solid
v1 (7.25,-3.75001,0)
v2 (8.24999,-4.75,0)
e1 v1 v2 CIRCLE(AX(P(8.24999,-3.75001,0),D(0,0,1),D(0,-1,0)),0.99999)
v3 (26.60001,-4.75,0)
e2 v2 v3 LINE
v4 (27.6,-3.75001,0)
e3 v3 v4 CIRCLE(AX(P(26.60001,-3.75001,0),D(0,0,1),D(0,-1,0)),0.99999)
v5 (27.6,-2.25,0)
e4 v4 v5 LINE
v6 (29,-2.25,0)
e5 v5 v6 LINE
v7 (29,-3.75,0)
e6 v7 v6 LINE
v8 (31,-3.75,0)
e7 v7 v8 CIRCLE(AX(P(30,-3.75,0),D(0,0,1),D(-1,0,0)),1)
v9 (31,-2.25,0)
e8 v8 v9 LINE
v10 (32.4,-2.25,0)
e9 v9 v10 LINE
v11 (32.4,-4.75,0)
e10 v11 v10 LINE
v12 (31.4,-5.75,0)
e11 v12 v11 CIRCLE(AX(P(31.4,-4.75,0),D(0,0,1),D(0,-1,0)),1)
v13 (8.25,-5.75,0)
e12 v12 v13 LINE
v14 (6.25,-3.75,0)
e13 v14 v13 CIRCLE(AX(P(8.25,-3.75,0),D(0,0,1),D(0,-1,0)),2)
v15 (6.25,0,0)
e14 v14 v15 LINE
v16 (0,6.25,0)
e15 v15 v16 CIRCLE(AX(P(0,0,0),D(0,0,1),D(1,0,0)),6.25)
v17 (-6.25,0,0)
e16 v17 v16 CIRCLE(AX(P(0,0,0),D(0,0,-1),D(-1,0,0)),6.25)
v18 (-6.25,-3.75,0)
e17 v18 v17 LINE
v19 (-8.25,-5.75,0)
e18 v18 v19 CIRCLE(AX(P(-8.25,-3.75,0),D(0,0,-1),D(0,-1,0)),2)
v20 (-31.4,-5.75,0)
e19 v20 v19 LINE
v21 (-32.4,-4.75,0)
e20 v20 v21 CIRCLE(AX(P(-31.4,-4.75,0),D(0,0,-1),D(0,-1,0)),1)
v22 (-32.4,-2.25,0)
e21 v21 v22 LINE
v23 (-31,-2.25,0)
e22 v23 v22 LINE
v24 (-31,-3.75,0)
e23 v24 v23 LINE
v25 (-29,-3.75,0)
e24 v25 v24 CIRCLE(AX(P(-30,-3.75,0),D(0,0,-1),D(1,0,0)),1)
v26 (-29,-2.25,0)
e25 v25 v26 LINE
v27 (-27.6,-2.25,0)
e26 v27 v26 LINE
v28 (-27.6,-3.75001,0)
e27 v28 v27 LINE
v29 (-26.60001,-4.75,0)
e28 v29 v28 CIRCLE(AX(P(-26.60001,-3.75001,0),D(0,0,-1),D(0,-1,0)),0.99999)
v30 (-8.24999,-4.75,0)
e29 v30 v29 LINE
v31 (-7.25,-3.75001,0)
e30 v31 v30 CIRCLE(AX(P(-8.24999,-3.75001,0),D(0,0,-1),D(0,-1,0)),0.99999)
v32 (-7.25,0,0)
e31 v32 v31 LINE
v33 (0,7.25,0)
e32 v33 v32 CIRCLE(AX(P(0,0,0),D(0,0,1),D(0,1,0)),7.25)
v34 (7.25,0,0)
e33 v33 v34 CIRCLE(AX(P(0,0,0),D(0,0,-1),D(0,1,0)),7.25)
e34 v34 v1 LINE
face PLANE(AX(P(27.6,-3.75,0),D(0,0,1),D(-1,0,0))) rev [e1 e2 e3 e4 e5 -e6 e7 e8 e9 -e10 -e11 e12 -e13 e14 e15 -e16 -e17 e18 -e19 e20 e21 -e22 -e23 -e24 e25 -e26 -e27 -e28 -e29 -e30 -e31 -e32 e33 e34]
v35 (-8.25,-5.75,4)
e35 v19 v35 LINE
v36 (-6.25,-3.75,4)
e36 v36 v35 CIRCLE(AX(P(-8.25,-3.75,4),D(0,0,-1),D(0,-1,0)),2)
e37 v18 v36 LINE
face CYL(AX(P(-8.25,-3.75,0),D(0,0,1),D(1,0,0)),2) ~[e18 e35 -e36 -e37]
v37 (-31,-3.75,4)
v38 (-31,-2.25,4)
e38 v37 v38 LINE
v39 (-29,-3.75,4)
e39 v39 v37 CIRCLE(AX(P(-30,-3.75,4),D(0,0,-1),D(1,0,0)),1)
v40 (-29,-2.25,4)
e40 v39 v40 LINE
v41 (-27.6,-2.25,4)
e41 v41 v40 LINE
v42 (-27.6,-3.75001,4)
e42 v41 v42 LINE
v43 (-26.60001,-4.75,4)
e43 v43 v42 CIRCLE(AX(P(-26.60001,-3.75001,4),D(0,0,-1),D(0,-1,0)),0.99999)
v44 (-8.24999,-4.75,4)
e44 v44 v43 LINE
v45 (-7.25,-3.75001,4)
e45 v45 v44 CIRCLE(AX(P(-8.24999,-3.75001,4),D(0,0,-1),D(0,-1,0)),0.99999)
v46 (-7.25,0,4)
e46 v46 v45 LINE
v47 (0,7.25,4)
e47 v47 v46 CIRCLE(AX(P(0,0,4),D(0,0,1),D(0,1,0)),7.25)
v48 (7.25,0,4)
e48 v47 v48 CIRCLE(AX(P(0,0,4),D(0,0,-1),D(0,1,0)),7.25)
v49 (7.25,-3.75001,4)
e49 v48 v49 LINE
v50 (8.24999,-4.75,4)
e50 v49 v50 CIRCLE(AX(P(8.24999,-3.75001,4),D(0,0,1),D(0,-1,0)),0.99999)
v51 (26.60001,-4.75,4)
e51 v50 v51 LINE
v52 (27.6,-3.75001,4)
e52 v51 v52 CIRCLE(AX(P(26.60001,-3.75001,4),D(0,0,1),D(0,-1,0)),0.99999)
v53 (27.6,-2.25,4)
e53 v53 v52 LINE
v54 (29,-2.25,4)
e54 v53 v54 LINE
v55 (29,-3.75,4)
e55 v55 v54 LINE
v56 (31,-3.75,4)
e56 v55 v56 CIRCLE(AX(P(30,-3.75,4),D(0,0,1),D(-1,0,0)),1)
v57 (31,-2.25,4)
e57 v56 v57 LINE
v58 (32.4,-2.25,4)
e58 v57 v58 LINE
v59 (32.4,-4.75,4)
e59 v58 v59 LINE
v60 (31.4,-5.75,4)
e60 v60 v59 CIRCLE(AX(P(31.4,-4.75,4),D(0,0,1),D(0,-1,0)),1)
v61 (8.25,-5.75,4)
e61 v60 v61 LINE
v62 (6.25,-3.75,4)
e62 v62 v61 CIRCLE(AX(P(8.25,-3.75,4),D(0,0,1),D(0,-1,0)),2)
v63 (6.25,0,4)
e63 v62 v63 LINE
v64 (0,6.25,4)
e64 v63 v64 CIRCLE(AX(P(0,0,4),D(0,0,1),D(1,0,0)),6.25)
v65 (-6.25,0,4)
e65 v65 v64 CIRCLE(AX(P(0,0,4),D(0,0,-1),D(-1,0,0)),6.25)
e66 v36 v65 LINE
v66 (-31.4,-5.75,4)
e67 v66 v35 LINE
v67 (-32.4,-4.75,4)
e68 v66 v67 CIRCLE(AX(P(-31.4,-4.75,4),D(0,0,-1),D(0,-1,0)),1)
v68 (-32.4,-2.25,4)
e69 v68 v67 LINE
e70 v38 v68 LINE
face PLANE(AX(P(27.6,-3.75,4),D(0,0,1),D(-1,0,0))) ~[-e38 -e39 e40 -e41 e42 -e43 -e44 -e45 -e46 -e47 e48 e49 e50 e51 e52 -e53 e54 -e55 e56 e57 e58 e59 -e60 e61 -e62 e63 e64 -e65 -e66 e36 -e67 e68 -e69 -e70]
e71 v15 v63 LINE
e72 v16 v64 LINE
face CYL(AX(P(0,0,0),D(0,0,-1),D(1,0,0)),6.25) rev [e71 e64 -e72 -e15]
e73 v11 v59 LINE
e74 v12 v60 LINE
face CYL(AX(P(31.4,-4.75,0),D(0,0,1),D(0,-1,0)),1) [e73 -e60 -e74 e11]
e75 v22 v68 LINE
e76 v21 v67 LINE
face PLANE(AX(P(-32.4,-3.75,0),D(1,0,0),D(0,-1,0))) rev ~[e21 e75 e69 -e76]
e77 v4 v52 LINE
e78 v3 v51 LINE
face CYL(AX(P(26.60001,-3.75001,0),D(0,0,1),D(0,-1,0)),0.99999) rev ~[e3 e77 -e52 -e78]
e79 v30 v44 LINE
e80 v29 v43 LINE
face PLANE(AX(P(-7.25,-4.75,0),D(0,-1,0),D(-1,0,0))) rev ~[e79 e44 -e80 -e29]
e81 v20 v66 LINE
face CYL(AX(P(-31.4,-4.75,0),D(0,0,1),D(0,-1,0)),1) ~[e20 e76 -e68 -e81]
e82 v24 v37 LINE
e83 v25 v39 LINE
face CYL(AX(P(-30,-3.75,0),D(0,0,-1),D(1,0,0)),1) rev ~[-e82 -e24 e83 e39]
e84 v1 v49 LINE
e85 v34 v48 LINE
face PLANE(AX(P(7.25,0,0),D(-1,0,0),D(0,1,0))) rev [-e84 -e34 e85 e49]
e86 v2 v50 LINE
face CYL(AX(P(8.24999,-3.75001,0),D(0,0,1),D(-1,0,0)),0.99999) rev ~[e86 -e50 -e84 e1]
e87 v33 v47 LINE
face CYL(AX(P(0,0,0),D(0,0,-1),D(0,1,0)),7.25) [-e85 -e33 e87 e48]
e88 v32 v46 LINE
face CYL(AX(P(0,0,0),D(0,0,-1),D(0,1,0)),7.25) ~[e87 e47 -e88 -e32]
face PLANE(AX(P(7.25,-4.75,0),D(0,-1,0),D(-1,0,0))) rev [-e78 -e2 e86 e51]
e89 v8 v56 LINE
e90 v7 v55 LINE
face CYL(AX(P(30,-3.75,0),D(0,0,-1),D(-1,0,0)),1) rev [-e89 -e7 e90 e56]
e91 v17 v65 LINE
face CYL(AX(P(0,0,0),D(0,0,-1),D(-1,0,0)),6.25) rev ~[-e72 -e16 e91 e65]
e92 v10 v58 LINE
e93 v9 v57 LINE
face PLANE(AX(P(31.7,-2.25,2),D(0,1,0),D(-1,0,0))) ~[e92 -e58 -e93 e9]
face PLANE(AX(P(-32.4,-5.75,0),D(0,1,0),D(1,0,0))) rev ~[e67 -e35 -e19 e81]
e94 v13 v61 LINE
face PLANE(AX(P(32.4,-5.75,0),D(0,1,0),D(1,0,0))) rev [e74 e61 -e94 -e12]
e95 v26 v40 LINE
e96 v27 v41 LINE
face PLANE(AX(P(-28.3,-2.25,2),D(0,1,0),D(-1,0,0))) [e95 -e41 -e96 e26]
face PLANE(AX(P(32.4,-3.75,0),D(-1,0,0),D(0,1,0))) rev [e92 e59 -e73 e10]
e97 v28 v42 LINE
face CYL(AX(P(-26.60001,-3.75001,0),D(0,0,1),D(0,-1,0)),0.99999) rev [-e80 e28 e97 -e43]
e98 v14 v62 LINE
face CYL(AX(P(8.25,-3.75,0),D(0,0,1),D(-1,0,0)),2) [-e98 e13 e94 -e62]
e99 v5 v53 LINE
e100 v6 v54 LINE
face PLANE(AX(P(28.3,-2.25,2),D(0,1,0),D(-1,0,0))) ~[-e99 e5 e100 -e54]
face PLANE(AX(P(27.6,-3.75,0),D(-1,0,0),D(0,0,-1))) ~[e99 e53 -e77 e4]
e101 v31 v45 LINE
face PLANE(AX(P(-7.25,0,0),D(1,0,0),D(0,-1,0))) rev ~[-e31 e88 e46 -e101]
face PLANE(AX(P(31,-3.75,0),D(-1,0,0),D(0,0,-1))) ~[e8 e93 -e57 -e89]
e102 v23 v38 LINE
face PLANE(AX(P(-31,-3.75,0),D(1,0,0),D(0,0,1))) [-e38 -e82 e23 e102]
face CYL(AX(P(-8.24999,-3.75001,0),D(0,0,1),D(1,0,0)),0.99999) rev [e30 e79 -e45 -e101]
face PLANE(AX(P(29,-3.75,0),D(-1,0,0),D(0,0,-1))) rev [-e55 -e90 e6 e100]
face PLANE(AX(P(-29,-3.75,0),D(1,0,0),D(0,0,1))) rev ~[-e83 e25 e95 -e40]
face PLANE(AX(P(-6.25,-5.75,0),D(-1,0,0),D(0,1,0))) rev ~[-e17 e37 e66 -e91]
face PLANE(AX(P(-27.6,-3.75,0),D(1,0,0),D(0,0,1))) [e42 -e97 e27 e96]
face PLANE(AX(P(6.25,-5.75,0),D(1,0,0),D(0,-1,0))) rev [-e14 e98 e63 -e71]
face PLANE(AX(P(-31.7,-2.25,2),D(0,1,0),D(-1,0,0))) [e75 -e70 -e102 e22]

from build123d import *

# Parameters (mm, degrees)
F1_DEPTH = 4
F2_R     = 0.99999
F3_R     = 2
F4_W     = 1.4
F4_H     = 4
F5_DEPTH = 1.5
F6_R     = 1


# Not quite as in the source:
# - a fillet or chamfer is up to 0.001 mm smaller than in the source, because OpenCascade refuses the exact size


with BuildPart() as f1:
    # F0 (on Top) → F1 (new body)
    with BuildSketch(Plane.XY):
        with BuildLine():
            Line((-6.25, -5.75), (-6.25, -3.6742346142))
            ThreePointArc((-6.25, -3.6742346142), (-6.9955342898, -1.9039432765), (-7.25, 0))
            Line((-7.25, 0), (-7.25, -4.75))
            Line((-7.25, -4.75), (-27.6, -4.75))
            Line((-27.6, -4.75), (-27.6, -3.75))
            Line((-27.6, -3.75), (-29, -3.75))
            ThreePointArc((-29, -3.75), (-30, -4.75), (-31, -3.75))
            Line((-31, -3.75), (-32.4, -3.75))
            ThreePointArc((-32.4, -3.75), (-31.6928932188, -4.0428932188), (-31.4, -4.75))
            ThreePointArc((-31.4, -4.75), (-31.6928932188, -5.4571067812), (-32.4, -5.75))
            Line((-32.4, -5.75), (-6.25, -5.75))
        make_face()
        with BuildLine():
            Line((-32.4, -3.75), (-32.4, -5.75))
            ThreePointArc((-32.4, -5.75), (-31.6928932188, -5.4571067812), (-31.4, -4.75))
            ThreePointArc((-31.4, -4.75), (-31.6928932188, -4.0428932188), (-32.4, -3.75))
        make_face()
        with BuildLine():
            ThreePointArc((-6.25, 0), (-4.4194173824, 4.4194173824), (0, 6.25))
            Line((0, 6.25), (0, 7.25))
            ThreePointArc((0, 7.25), (-5.1265241636, 5.1265241636), (-7.25, 0))
            ThreePointArc((-7.25, 0), (-6.9955342898, -1.9039432765), (-6.25, -3.6742346142))
            Line((-6.25, -3.6742346142), (-6.25, 0))
        make_face()
    extrude(amount=F1_DEPTH)

    # F2 (radius 1 in the source; OpenCascade refuses exactly that, so slightly less here)
    f2_edges = [f1.edges().sort_by_distance(p)[0] for p in [
        (-27.6, -4.75, 2),
        (-7.25, -4.75, 2),
    ]]
    fillet(f2_edges, radius=F2_R)

    # F3
    f3_edges = [f1.edges().sort_by_distance(p)[0] for p in [
        (-6.25, -5.75, 2),
    ]]
    fillet(f3_edges, radius=F3_R)

    # F4 (on face) → F5 (join)
    with BuildSketch(Plane(origin=(0, -3.75, 0), x_dir=(-1, 0, 0), z_dir=(0, 1, 0))):
        with Locations((28.3, 2)):
            Rectangle(F4_W, F4_H)
        with Locations((31.7, 2)):
            Rectangle(F4_W, F4_H)
    extrude(amount=F5_DEPTH)

    # F6
    f6_edges = [f1.edges().sort_by_distance(p)[0] for p in [
        (-32.4, -5.75, 2),
    ]]
    fillet(f6_edges, radius=F6_R)

    # F7: F1 across plane


with BuildPart() as f1_1:
    add(f1.part)
    add(f1.part.mirror(Plane.YZ))


solid = f1_1.part
